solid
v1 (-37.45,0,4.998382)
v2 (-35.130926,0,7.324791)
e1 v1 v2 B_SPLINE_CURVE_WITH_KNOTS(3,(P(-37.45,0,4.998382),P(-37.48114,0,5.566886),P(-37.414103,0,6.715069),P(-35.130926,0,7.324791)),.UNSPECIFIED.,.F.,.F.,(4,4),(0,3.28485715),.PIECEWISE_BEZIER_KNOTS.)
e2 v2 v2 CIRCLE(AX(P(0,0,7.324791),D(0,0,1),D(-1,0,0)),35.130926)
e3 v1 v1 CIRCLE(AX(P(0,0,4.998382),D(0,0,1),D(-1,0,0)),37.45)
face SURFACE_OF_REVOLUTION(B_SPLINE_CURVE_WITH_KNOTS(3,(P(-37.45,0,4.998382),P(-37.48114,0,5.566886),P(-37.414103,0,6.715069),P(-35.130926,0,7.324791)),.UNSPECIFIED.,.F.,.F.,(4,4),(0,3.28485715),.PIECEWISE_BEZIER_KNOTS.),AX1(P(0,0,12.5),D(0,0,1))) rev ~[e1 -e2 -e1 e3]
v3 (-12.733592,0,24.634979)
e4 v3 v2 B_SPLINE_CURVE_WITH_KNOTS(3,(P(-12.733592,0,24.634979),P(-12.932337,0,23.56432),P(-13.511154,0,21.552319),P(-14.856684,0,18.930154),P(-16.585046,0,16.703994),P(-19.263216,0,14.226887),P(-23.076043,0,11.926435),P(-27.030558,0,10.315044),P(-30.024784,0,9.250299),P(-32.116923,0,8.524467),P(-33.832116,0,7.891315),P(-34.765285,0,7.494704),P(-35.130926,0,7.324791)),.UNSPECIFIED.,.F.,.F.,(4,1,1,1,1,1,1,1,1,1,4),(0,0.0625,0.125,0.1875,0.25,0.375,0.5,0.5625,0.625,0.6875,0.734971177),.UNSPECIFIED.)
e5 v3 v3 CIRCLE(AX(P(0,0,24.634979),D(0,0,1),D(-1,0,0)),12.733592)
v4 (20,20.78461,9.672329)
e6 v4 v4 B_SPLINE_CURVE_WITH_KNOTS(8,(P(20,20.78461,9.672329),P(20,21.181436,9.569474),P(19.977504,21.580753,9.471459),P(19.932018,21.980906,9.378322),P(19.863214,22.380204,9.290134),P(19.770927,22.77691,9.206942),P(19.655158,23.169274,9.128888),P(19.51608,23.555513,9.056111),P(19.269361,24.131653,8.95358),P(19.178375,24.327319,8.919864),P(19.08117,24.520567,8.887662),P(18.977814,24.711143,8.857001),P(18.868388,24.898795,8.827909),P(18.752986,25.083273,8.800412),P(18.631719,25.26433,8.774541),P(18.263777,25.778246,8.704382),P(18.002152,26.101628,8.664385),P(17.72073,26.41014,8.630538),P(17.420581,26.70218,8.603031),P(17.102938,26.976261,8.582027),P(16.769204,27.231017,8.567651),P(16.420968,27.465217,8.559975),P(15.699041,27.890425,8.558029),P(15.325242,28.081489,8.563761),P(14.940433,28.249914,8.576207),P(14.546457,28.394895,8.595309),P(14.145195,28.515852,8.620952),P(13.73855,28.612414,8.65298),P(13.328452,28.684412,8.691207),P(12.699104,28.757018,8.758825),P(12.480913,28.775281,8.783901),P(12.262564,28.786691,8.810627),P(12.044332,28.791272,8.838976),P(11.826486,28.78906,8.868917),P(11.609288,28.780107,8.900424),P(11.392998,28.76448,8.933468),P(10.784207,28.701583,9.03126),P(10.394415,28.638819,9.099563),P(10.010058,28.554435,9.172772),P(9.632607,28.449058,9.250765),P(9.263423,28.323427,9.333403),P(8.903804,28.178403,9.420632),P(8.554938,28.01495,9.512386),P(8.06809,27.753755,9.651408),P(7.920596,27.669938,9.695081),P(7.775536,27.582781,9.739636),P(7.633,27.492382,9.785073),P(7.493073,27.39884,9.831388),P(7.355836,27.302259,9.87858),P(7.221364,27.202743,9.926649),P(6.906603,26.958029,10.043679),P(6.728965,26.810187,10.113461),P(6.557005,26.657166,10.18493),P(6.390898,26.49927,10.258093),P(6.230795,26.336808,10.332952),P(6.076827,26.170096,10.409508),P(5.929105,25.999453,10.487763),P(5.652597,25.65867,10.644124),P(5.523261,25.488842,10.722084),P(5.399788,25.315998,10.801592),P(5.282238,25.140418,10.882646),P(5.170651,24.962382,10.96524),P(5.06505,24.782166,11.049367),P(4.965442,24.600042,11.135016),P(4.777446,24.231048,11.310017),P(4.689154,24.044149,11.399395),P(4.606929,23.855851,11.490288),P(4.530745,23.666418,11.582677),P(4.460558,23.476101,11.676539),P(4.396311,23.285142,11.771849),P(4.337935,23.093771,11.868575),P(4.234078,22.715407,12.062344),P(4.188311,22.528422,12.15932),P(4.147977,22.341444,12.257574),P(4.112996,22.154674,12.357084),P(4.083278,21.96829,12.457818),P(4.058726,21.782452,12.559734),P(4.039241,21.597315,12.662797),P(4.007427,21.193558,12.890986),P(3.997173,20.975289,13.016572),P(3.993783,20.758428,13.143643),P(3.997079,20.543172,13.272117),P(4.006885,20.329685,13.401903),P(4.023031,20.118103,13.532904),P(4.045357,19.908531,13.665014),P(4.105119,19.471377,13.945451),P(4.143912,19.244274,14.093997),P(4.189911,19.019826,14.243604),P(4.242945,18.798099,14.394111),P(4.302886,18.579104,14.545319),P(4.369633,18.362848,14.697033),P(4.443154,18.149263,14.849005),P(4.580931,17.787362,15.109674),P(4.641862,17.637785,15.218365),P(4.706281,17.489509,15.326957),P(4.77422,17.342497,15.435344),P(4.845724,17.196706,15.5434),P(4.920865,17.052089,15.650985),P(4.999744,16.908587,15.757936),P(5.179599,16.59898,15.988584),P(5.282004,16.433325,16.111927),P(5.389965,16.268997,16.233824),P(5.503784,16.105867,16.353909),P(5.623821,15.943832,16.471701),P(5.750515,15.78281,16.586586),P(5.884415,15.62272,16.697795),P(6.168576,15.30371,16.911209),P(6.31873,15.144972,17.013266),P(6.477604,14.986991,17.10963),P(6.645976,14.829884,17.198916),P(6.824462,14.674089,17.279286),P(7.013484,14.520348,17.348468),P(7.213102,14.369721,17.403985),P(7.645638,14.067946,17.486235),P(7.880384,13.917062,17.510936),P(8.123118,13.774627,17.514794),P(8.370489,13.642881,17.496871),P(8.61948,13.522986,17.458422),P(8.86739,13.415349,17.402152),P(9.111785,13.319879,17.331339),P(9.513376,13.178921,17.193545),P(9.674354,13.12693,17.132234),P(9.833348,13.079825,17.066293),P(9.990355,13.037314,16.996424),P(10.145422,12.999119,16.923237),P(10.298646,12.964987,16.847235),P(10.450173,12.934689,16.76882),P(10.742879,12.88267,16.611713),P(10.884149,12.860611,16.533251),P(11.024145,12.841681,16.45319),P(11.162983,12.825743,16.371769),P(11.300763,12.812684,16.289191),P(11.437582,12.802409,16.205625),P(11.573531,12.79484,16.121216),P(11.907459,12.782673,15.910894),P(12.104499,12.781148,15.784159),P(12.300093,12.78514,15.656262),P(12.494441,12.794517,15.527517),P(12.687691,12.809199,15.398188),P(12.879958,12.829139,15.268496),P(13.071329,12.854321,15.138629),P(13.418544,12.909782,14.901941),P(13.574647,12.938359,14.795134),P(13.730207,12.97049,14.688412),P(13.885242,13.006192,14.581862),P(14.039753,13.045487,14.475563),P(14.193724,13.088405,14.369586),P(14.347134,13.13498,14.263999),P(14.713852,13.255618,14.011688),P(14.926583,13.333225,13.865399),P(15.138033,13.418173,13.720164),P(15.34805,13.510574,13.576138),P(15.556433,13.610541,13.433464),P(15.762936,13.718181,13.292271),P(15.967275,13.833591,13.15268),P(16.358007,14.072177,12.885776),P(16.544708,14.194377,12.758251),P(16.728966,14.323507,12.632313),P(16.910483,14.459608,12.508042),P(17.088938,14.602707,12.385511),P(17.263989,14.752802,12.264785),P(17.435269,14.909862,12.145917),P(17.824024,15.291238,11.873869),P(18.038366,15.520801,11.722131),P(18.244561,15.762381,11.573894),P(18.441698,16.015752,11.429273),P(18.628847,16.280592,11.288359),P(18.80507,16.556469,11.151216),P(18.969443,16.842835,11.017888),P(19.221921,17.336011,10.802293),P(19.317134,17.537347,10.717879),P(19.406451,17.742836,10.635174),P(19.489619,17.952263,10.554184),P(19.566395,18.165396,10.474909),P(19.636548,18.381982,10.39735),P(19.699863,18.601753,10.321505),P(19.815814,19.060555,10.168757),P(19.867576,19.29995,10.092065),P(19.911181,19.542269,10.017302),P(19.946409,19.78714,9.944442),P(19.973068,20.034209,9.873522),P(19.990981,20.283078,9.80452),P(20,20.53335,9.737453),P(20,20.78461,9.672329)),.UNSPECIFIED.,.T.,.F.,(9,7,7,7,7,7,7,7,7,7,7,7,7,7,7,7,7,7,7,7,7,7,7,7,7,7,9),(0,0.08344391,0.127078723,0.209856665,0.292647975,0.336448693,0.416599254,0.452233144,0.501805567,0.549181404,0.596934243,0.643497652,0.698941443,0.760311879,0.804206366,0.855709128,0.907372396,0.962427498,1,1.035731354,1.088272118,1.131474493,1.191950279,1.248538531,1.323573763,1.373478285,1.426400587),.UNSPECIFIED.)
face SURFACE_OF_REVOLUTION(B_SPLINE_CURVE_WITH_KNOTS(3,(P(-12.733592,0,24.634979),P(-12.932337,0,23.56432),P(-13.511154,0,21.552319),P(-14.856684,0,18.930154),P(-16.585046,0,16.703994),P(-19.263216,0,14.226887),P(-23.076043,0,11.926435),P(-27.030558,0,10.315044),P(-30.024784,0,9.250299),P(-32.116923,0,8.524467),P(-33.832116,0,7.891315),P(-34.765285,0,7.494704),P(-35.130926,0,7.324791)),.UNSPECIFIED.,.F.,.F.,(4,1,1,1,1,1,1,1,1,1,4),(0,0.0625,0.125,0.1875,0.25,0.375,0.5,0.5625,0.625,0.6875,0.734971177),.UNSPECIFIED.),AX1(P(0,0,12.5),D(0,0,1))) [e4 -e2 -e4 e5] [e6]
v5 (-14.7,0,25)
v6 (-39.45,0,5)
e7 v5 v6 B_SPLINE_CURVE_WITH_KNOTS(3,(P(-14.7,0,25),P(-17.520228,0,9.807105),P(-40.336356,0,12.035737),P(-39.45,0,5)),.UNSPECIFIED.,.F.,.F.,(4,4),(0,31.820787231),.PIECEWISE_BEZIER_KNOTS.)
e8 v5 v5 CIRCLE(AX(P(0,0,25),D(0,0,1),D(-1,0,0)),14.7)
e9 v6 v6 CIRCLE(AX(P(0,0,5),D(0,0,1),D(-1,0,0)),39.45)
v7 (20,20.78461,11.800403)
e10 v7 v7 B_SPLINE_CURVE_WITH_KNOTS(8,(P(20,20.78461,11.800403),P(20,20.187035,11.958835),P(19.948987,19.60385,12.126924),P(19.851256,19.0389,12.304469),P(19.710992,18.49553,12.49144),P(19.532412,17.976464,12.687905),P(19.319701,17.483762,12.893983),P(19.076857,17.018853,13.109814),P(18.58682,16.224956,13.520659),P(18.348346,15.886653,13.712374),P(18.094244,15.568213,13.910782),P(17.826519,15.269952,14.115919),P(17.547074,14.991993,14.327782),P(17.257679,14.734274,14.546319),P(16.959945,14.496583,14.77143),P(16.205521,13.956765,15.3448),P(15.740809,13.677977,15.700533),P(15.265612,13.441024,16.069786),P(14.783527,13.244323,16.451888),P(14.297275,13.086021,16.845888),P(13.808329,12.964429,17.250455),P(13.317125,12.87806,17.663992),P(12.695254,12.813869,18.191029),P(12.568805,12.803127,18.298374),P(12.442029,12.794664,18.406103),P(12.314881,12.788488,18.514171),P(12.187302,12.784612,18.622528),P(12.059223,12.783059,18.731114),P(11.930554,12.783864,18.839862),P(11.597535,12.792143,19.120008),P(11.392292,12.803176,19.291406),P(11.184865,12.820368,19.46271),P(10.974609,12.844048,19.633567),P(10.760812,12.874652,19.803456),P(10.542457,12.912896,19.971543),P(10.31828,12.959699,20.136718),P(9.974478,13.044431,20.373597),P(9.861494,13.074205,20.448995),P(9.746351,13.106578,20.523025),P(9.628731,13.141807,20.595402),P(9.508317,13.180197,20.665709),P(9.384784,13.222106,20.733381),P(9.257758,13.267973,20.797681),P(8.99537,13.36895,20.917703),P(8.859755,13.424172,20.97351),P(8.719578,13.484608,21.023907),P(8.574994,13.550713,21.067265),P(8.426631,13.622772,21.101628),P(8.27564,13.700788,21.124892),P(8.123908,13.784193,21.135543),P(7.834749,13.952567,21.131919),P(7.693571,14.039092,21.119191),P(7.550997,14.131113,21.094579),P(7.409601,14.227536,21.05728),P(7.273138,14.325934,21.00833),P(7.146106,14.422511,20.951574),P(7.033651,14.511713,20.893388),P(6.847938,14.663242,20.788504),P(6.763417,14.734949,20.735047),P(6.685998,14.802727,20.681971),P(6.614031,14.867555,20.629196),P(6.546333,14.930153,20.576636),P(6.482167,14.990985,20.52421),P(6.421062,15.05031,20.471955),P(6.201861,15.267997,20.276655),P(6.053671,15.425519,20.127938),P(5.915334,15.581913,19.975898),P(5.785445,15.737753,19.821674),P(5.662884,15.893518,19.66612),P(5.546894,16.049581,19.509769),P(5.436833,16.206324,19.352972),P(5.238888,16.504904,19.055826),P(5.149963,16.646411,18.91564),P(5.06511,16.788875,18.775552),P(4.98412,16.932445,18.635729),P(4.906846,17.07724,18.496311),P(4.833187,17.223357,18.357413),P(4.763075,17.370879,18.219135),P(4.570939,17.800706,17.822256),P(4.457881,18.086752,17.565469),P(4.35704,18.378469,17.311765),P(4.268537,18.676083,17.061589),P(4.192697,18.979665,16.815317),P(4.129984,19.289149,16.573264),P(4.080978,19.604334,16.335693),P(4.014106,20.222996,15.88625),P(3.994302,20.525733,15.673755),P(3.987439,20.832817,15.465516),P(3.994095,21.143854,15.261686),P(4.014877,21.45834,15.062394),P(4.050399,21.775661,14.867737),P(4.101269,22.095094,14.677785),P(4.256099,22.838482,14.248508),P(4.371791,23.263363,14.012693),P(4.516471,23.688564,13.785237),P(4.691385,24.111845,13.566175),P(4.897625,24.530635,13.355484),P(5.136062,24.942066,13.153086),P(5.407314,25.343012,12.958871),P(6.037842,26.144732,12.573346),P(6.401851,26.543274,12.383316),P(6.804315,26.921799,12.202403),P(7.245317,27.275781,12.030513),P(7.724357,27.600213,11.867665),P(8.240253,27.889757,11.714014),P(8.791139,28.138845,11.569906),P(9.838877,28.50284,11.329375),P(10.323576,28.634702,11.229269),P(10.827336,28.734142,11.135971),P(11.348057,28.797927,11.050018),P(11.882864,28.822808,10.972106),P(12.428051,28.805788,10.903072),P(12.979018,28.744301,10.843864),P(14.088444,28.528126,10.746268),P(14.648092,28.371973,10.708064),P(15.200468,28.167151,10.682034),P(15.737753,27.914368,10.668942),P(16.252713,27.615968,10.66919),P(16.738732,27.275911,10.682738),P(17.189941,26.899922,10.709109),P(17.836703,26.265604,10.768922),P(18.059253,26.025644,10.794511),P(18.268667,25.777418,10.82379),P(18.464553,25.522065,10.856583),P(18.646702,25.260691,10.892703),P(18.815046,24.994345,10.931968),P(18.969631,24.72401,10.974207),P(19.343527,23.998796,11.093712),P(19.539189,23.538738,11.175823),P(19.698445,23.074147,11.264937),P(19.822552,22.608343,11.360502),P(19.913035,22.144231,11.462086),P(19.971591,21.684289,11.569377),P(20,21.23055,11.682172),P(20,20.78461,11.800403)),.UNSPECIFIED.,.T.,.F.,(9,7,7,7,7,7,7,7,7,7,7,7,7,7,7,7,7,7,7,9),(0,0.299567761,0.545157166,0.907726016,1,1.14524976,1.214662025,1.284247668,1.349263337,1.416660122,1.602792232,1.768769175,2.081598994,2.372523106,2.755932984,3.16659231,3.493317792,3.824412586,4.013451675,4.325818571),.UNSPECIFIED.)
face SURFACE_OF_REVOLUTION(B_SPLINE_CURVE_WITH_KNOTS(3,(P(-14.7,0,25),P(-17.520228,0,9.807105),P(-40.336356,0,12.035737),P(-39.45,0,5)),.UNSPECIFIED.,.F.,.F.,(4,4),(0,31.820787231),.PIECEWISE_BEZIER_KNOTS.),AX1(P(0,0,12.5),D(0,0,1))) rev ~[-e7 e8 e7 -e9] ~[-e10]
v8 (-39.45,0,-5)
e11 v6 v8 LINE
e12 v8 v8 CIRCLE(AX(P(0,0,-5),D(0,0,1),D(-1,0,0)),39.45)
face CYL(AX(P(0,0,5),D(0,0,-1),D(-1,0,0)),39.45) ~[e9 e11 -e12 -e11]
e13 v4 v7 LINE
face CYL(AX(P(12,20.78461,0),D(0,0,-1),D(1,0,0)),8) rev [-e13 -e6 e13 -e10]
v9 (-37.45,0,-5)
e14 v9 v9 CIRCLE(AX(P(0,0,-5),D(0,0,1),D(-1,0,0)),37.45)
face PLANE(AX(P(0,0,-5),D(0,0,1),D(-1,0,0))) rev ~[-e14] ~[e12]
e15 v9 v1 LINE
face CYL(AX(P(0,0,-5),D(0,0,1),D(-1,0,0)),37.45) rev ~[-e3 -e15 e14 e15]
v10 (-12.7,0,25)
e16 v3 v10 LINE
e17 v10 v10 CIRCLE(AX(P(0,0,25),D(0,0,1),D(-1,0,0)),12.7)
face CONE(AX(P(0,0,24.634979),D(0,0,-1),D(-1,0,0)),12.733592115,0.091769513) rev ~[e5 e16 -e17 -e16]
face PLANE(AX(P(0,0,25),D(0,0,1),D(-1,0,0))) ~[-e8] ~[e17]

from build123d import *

# Parameters (mm, degrees)
F2_R          = 8
F3_DEPTH      = 25
F3_DEPTH_BACK = 25


# Not quite as in the source:
# - ends of sketch curves that miss each other by under 0.0002 mm in the source are joined
# - the dataset's text gives a spline's control points without its knots; the knots are read off the source's solid


with BuildPart() as f1:
    # F0 (on Front) → F1 (revolve)
    with BuildSketch(Plane.XZ):
        with BuildLine():
            Line((-37.45, -5), (-37.45, 0))
            Line((-37.45, 0), (-37.45, 4.9983821809))
            add(Edge.make_bspline(
                [(-37.45, 4.9983821809), (-37.4811403453, 5.5668856949), (-37.4141025822, 6.7150686136), (-35.1309255123, 7.3247914341)],
                knots=[0, 0, 0, 0, 3.2848571495, 3.2848571495, 3.2848571495, 3.2848571495], degree=3))
            add(Edge.make_bspline(
                [(-12.7335921145, 24.6349794144), (-12.9323365147, 23.5643204678), (-13.5111538376, 21.5523185481), (-14.8566836985, 18.9301540928), (-16.5850456529, 16.703993525), (-19.2632159702, 14.2268867189), (-23.0760434925, 11.9264351436), (-27.0305583413, 10.3150437437), (-30.0247840747, 9.2502993394), (-32.1169229262, 8.5244666288), (-33.8321158659, 7.8913152422), (-34.7652845833, 7.4947040144), (-35.1309255123, 7.3247914341)],
                knots=[0, 0, 0, 0, 0.0625, 0.125, 0.1875, 0.25, 0.375, 0.5, 0.5625, 0.625, 0.6875, 0.7349711774, 0.7349711774, 0.7349711774, 0.7349711774], degree=3))
            Line((-12.7335921145, 24.6349794144), (-12.7, 25))
            Line((-12.7, 25), (-14.7, 25))
            add(Edge.make_bspline(
                [(-14.7, 25), (-17.5202284008, 9.8071051762), (-40.336355567, 12.0357368141), (-39.45, 5)],
                knots=[0, 0, 0, 0, 31.820787231, 31.820787231, 31.820787231, 31.820787231], degree=3))
            Line((-39.45, 5), (-39.45, -5))
            Line((-39.45, -5), (-37.45, -5))
        make_face()
    revolve(axis=Axis((0, 0, 12.5), (0, 0, 1)))

    # F2 (on Top) → F3 (cut, two sides)
    with BuildSketch(Plane.XY) as f3_sk:
        with Locations((12, 20.7846096908)):
            Circle(F2_R)
    extrude(amount=F3_DEPTH, mode=Mode.SUBTRACT)
    extrude(f3_sk.sketch, amount=-F3_DEPTH_BACK, mode=Mode.SUBTRACT)


solid = f1.part
